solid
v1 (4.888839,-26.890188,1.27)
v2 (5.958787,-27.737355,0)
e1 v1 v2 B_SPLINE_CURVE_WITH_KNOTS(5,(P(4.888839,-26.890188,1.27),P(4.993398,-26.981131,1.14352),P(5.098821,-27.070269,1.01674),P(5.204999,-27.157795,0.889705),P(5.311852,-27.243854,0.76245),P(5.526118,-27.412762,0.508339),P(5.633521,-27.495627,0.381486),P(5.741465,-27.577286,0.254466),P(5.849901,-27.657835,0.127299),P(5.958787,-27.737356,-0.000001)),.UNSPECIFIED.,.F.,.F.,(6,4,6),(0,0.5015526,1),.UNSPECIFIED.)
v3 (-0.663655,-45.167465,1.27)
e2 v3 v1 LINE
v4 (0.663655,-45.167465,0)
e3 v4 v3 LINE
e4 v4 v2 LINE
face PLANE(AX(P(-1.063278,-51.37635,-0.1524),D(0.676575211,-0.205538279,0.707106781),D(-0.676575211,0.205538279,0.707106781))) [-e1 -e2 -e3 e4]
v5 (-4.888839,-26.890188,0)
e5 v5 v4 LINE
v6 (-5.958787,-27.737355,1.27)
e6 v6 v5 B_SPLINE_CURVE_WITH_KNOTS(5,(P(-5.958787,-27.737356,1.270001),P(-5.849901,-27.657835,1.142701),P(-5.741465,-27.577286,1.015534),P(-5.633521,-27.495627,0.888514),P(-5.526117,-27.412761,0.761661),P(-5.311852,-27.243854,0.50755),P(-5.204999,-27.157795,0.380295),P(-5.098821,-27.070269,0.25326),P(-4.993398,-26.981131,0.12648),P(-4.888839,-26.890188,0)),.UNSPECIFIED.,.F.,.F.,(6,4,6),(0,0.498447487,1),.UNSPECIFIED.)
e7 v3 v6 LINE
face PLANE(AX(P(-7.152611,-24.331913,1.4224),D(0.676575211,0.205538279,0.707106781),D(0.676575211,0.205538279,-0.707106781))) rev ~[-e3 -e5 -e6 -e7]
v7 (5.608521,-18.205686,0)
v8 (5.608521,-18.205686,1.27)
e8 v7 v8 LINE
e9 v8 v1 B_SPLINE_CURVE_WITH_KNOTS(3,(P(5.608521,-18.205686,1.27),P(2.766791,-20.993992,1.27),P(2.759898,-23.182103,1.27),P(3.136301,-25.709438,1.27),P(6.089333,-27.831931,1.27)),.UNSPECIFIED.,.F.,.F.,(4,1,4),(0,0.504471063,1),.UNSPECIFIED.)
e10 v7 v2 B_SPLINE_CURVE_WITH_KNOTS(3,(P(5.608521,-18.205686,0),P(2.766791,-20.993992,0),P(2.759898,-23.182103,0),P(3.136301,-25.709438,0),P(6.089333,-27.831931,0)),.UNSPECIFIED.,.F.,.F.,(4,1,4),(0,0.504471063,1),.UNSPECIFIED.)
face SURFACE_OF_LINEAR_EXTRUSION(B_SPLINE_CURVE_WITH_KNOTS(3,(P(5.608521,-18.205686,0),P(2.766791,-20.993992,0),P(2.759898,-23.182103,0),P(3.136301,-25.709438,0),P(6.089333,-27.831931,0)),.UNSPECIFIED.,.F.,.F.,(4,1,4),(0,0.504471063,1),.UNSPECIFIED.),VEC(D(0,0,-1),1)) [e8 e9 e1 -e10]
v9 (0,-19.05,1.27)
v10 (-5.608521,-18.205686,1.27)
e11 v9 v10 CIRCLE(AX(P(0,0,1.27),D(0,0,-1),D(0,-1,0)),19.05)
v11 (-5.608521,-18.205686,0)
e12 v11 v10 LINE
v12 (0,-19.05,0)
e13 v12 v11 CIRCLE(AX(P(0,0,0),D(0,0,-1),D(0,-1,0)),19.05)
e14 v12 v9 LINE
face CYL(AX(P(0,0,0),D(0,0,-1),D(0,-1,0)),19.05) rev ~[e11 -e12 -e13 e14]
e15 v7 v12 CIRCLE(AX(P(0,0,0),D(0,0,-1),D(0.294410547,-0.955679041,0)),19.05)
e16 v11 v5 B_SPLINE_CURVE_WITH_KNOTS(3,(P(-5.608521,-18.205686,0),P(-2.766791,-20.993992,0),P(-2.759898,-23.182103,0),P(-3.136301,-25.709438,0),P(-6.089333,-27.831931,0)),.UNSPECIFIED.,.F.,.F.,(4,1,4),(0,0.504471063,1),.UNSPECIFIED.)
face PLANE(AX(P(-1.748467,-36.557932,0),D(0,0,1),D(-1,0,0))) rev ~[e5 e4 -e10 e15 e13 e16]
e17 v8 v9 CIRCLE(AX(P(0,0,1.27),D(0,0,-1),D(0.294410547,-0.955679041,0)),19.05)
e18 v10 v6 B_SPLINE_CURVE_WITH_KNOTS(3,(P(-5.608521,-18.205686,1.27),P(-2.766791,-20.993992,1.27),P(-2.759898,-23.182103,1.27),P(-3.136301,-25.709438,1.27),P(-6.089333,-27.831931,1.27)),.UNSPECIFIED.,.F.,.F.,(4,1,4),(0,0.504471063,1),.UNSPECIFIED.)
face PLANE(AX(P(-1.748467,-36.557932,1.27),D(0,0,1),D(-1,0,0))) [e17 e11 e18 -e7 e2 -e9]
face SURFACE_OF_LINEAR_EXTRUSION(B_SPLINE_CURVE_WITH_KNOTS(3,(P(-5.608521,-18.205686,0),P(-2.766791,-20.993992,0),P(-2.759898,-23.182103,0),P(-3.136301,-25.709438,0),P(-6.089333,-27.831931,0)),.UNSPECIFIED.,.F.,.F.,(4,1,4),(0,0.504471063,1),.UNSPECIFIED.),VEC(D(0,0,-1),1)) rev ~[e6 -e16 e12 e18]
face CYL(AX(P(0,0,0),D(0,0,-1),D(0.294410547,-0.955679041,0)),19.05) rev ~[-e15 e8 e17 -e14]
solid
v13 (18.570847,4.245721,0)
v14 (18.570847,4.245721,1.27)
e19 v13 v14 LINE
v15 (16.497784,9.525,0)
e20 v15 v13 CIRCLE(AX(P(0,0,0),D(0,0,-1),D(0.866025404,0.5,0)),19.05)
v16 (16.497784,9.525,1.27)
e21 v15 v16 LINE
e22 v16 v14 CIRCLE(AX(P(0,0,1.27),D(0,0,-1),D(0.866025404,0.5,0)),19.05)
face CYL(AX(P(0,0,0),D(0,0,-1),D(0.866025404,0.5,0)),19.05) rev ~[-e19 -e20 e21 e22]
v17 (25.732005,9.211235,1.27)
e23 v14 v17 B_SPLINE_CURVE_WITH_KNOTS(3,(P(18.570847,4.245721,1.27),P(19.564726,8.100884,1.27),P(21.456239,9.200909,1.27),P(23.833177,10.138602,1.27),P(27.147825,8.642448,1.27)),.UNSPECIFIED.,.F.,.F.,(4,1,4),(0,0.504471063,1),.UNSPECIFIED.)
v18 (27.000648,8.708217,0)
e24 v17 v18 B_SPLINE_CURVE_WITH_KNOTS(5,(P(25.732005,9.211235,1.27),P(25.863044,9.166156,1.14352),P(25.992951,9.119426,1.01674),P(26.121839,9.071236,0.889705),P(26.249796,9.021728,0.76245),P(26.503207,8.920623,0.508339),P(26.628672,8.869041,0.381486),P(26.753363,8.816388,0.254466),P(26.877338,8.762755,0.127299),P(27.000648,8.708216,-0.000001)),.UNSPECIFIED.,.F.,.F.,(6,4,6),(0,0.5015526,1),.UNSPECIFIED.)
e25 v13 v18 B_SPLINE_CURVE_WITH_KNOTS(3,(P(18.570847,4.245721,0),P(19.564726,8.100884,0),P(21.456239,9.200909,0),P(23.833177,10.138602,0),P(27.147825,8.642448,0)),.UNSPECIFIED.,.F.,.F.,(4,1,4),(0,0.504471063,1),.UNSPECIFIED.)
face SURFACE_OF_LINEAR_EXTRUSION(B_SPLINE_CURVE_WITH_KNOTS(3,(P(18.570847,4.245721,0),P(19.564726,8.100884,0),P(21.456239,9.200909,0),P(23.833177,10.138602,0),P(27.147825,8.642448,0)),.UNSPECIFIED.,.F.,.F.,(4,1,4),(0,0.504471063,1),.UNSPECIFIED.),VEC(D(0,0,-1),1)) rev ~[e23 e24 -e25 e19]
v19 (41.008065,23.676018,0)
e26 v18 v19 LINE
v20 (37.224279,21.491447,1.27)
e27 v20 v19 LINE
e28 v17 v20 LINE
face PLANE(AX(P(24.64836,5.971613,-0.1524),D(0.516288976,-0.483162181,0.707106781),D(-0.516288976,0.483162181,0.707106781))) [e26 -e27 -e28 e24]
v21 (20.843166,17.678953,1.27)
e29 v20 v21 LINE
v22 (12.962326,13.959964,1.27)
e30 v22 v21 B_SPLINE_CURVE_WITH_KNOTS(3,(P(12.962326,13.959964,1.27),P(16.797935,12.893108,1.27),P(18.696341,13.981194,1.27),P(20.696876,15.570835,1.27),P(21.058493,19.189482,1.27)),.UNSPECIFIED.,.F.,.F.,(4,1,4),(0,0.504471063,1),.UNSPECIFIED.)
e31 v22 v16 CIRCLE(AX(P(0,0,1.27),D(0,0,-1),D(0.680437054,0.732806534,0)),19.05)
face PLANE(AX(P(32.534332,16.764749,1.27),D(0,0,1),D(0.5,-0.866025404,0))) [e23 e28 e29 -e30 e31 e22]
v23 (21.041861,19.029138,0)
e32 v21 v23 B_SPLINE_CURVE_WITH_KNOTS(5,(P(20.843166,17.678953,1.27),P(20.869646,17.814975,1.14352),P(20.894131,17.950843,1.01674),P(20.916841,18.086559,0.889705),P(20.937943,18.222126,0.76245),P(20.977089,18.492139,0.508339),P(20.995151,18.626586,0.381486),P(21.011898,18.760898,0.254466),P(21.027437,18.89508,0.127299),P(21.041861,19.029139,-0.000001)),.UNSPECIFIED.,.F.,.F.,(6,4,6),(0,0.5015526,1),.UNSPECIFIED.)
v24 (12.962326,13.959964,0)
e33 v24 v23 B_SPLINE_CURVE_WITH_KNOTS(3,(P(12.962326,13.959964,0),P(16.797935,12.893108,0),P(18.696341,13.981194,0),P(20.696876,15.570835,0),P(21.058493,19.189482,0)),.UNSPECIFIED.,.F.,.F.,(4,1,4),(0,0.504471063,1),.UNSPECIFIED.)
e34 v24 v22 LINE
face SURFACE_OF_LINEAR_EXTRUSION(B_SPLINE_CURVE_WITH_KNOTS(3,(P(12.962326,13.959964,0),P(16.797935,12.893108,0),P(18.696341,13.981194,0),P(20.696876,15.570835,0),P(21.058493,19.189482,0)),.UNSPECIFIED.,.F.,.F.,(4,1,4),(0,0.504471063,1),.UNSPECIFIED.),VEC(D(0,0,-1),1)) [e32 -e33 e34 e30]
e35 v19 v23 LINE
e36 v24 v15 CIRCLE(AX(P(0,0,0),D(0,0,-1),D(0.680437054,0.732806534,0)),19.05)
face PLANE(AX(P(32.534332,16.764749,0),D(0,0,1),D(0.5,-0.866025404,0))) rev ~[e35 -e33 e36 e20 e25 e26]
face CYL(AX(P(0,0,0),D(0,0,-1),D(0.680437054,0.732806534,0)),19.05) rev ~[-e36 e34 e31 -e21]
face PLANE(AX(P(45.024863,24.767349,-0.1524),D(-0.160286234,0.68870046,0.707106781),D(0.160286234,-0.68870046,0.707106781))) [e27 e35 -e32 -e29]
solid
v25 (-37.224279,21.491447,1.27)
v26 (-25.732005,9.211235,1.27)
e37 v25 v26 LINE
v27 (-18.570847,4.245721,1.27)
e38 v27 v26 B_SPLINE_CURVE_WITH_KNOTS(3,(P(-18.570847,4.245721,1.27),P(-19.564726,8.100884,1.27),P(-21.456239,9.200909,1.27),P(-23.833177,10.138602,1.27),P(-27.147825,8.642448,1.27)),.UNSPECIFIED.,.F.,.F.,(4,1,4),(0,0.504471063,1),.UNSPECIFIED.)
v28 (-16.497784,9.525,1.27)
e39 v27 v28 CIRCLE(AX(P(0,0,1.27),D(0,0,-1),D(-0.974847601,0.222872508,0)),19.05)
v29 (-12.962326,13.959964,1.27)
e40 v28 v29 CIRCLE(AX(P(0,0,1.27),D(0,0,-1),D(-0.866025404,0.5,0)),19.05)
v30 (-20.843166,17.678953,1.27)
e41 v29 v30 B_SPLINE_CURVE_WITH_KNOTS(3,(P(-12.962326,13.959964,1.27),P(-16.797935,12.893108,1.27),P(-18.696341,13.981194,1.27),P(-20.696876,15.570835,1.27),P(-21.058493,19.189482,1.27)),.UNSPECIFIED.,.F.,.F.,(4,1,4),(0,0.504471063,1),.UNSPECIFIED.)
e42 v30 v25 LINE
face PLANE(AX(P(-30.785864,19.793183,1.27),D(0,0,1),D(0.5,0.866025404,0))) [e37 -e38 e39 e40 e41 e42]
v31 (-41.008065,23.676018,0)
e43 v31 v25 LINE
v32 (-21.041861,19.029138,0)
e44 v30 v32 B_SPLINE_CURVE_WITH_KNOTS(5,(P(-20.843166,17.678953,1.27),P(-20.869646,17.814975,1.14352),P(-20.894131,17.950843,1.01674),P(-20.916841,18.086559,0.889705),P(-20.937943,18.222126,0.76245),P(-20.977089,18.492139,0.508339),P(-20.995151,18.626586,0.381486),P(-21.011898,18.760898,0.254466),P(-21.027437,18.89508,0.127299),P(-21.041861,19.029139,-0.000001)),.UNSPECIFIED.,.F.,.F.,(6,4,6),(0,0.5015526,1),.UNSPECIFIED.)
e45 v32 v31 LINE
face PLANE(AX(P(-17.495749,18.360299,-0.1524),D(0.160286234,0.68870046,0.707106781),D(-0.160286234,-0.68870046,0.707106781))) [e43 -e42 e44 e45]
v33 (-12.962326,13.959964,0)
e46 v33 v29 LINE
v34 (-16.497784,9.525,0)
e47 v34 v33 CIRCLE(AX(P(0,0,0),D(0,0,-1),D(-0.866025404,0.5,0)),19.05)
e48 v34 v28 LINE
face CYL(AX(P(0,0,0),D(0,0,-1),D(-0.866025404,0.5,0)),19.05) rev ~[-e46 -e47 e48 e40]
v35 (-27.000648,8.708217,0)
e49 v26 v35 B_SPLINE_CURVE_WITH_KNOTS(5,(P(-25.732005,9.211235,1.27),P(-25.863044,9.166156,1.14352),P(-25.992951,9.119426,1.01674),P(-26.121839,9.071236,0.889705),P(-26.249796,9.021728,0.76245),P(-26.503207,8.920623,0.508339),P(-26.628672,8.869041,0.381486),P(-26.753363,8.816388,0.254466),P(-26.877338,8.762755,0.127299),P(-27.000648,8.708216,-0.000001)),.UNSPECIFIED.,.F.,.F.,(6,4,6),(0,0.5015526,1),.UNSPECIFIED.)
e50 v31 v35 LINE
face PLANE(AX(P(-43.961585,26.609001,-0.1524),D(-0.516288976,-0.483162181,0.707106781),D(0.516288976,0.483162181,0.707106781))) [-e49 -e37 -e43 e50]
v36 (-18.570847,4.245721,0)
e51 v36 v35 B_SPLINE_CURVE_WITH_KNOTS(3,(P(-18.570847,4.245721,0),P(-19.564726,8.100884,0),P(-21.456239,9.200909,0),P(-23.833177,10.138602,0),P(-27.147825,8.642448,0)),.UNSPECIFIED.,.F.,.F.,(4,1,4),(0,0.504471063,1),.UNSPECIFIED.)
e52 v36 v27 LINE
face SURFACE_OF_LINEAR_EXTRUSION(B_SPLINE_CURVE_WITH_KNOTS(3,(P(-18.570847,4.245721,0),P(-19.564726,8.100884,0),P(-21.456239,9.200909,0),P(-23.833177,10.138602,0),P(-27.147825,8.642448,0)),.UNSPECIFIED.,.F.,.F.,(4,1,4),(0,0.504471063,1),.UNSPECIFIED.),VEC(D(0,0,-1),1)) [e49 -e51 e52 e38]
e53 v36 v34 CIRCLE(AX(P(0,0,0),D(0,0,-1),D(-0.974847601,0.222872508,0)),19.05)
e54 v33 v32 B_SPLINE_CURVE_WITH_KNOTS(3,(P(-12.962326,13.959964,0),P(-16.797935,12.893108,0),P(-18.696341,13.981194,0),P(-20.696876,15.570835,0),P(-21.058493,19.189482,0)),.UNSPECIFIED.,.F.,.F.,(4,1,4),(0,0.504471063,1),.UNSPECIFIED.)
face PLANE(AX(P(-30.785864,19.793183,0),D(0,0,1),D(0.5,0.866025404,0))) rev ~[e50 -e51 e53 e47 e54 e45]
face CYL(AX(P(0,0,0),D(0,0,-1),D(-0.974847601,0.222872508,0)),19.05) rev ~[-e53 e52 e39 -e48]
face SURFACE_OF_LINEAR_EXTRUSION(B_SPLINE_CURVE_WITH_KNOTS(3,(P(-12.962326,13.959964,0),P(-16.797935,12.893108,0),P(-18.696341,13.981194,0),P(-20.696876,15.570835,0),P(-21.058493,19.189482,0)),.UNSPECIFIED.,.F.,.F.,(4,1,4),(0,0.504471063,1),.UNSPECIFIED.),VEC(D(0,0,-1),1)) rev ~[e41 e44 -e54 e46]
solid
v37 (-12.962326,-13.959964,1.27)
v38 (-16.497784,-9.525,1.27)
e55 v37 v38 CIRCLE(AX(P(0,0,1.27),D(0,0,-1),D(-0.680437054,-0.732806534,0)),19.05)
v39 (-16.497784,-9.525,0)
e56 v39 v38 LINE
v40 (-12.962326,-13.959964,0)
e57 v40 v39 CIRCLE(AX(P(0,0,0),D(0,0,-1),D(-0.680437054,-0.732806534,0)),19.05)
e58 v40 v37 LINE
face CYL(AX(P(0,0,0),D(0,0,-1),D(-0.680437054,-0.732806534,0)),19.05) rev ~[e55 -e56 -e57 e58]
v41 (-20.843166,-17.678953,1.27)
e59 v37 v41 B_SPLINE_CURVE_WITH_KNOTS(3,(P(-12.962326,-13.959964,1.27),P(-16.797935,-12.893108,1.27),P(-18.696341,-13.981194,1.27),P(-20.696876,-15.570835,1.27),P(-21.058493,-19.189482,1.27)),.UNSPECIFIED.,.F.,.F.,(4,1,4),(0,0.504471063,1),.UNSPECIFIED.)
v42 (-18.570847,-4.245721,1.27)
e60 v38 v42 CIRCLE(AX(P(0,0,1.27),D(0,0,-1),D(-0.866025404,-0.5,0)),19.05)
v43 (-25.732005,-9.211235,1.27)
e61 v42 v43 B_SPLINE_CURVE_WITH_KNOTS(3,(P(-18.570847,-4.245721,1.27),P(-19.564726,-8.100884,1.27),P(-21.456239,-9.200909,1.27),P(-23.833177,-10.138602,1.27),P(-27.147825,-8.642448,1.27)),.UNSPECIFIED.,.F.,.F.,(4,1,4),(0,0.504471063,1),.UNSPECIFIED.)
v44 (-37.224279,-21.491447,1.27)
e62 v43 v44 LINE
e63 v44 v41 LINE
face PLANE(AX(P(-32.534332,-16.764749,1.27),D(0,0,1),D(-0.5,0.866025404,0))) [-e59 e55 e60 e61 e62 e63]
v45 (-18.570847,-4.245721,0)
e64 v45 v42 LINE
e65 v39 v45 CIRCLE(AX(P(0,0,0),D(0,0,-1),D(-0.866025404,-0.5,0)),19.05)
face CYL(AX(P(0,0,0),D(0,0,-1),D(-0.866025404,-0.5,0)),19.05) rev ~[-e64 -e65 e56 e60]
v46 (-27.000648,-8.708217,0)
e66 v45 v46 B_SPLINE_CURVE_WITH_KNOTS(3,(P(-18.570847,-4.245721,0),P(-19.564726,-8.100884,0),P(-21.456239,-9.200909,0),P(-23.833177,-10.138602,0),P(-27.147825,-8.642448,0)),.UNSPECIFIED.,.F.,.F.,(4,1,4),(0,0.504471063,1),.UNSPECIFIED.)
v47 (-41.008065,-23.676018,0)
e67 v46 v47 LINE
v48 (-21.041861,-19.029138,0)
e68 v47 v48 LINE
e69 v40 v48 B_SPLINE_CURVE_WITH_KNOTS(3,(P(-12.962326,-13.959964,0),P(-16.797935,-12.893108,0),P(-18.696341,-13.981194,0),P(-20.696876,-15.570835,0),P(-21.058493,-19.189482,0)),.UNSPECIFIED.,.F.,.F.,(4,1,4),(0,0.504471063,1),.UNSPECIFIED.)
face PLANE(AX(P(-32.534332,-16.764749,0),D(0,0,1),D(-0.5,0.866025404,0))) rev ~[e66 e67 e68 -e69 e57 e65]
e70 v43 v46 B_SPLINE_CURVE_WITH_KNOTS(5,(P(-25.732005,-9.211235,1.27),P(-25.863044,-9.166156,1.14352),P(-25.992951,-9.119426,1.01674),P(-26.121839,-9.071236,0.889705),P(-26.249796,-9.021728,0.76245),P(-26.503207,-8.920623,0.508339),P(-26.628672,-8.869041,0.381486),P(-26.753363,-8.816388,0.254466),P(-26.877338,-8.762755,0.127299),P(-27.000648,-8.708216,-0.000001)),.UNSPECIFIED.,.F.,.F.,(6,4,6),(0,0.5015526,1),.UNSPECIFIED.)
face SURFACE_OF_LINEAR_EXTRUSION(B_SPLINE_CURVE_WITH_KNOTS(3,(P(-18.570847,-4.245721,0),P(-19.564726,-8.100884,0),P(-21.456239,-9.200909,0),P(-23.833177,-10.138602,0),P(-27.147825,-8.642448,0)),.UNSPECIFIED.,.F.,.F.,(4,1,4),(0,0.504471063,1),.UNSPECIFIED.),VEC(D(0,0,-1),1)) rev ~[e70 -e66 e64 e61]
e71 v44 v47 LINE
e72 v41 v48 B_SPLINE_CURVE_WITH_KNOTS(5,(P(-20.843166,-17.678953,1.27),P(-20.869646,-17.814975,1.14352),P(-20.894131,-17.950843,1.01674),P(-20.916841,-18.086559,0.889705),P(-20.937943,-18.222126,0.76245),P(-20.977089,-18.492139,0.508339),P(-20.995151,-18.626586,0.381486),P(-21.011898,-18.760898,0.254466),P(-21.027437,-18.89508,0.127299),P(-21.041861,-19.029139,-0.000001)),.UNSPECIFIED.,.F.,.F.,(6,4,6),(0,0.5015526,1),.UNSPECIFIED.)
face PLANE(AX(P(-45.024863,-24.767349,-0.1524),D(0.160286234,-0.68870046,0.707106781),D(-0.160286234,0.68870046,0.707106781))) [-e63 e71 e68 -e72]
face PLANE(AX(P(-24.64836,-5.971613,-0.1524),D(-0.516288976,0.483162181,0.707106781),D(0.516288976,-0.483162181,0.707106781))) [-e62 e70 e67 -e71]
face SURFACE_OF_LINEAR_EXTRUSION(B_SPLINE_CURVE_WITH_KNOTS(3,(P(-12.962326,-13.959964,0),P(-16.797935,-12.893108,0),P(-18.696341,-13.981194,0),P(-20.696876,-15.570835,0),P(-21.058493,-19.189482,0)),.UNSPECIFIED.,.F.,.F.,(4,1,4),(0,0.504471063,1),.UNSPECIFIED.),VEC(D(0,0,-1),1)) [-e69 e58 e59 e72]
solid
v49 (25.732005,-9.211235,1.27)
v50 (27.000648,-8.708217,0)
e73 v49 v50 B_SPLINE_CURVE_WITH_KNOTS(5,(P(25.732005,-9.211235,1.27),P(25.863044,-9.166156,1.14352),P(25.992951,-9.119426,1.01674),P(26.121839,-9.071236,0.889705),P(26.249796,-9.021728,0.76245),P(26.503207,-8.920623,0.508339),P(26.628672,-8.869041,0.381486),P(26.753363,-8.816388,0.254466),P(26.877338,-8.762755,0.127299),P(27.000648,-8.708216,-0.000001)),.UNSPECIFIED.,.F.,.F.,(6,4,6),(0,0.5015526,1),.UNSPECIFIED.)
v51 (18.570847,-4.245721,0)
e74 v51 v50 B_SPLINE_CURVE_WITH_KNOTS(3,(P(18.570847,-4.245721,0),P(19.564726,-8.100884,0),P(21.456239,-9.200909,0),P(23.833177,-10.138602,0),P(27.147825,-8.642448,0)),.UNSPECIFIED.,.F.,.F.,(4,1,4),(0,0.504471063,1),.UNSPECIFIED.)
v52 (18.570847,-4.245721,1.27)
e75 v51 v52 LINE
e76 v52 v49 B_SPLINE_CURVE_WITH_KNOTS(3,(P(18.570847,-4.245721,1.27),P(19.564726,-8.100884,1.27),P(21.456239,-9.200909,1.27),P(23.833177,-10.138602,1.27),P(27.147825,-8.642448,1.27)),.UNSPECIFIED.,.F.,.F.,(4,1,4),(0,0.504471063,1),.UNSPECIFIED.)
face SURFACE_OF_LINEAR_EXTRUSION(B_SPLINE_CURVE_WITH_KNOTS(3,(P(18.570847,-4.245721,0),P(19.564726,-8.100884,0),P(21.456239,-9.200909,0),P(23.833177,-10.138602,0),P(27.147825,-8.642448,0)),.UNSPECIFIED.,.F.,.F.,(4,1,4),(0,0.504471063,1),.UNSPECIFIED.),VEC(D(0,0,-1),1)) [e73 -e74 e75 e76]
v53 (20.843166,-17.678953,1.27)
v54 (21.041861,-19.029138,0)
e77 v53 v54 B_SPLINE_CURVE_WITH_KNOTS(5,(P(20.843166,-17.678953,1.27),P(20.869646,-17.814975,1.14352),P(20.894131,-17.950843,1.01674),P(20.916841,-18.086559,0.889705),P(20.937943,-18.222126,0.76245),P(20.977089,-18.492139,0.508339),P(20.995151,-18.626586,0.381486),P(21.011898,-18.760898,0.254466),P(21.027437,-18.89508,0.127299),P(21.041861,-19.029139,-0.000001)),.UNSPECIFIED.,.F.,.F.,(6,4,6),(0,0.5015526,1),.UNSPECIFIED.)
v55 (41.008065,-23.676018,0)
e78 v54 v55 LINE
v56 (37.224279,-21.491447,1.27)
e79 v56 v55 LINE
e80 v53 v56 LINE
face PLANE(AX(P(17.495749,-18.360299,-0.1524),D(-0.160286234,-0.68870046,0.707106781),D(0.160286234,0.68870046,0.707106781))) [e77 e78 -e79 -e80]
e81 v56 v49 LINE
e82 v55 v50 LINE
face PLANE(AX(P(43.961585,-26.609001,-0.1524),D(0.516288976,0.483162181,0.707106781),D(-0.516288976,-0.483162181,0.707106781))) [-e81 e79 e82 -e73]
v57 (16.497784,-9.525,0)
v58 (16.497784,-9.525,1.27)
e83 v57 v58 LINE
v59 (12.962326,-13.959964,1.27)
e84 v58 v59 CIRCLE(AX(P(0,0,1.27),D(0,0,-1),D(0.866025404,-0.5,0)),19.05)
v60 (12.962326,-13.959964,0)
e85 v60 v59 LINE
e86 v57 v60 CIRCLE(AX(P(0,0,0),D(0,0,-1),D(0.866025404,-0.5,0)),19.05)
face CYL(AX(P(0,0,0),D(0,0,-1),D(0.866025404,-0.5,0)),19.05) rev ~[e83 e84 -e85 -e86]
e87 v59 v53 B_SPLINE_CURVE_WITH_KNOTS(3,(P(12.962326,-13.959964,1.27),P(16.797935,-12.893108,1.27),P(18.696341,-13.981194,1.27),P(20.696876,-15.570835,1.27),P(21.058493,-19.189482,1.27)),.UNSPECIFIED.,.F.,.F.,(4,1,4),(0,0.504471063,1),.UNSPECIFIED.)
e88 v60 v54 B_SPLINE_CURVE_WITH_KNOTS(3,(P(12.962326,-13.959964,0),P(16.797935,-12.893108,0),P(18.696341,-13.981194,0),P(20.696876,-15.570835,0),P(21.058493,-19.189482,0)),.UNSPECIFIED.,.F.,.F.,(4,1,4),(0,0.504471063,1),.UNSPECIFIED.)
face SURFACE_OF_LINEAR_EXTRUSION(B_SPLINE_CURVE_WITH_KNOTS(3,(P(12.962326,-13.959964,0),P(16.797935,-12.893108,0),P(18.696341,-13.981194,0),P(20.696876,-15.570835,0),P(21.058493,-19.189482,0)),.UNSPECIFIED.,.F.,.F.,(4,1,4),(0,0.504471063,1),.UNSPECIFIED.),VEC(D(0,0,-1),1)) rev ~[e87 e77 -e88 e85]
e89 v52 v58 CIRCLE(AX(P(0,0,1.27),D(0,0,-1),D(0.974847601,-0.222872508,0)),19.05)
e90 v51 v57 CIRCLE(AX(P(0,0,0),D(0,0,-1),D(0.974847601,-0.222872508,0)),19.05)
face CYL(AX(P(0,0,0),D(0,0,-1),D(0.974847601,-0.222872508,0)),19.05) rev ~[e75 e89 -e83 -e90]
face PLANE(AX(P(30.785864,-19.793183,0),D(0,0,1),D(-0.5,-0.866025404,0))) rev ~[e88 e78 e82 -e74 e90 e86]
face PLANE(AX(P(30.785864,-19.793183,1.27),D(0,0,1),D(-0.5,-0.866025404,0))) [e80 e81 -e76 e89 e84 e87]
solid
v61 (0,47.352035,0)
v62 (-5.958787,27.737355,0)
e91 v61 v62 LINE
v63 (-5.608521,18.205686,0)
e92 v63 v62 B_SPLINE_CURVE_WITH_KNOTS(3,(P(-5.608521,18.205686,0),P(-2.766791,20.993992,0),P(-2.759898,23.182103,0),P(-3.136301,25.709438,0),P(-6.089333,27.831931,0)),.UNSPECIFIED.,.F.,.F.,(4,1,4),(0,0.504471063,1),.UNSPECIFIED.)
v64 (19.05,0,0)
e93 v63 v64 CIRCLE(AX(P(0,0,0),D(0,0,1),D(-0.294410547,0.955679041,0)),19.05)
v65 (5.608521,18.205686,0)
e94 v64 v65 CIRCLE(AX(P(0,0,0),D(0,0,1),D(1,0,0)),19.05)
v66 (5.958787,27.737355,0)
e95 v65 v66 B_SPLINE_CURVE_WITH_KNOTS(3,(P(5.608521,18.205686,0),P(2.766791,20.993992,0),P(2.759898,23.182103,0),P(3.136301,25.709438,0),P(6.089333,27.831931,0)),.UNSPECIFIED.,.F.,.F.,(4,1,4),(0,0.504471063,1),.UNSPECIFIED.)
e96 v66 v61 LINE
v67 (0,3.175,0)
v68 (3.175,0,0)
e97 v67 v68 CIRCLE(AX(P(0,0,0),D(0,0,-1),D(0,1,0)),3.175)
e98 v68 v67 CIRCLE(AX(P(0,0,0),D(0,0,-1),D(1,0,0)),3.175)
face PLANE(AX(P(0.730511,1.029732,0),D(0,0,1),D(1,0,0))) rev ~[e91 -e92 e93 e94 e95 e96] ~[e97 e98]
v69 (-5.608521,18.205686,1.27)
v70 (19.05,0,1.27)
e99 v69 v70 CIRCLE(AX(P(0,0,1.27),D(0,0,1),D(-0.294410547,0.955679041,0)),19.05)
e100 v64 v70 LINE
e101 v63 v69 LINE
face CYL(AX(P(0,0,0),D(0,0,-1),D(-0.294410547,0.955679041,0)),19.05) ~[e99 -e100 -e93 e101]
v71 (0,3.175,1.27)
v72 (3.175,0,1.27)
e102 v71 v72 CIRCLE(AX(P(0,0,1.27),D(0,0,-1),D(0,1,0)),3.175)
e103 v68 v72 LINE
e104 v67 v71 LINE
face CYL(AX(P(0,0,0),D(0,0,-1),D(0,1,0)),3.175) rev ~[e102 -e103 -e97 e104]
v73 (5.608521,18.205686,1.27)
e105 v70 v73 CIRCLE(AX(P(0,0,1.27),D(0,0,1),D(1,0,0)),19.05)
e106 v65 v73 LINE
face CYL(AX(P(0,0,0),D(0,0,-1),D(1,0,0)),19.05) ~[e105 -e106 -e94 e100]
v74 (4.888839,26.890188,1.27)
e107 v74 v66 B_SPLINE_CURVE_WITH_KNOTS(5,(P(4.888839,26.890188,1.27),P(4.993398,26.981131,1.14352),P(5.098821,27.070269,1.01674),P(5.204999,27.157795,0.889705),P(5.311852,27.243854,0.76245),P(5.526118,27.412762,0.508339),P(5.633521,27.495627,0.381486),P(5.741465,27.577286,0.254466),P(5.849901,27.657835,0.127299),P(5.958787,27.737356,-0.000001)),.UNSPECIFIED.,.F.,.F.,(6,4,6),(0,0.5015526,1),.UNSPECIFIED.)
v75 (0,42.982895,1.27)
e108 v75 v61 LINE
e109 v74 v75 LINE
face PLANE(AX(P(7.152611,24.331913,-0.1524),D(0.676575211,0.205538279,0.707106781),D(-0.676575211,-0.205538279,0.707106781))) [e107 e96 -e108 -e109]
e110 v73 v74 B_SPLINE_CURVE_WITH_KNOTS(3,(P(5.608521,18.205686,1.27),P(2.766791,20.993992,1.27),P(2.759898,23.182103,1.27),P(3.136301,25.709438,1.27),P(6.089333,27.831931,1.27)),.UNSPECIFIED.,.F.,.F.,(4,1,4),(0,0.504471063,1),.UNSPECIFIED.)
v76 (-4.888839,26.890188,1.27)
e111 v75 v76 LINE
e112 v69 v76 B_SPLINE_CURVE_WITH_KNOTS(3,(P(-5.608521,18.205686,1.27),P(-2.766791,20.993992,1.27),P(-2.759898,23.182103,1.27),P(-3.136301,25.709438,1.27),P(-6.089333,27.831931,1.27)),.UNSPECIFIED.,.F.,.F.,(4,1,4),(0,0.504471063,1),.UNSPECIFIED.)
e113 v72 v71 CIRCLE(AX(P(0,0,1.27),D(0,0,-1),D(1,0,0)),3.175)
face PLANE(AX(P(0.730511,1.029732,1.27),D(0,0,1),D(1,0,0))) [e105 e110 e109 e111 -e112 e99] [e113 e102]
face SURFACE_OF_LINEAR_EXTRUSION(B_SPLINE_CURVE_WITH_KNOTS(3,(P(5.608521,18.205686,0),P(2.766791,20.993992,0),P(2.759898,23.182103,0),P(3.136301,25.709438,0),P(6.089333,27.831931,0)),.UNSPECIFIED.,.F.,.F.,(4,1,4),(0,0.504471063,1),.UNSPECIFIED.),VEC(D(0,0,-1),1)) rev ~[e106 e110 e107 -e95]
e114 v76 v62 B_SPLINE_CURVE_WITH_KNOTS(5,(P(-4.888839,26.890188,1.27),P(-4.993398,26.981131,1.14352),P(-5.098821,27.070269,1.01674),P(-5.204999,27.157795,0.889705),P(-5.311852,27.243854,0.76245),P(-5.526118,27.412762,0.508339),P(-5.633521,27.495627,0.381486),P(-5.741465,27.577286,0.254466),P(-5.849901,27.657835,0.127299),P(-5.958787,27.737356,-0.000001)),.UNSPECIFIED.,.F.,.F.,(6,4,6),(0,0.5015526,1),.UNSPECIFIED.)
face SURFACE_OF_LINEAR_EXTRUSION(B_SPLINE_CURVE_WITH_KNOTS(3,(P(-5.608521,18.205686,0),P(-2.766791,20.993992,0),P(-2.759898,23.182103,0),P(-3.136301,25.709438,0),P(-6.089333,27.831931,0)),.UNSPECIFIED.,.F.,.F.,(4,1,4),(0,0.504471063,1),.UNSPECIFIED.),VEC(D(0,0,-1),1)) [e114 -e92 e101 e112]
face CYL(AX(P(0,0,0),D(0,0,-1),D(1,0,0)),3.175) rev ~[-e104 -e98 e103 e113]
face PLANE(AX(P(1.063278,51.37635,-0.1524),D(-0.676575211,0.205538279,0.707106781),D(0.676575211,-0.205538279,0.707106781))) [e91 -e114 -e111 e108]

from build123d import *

# Parameters (mm, degrees)
F1_DEPTH      = 1.27
F2_COUNT      = 6
F3_DEPTH      = 1.27
F4_T1_DEPTH   = 28.2648616639
F4_T3_DEPTH   = 28.2648616639
F4_2_T1_DEPTH = 28.2648616639
F4_2_T3_DEPTH = 28.2648616639
F4_3_T1_DEPTH = 28.2648616639
F4_3_T3_DEPTH = 28.2648616639
F4_4_T1_DEPTH = 28.2648616639
F4_4_T3_DEPTH = 28.2648616639
F4_5_T1_DEPTH = 28.2648616639
F4_5_T3_DEPTH = 28.2648616639
F4_6_T1_DEPTH = 28.2648616639
F4_6_T3_DEPTH = 28.2648616639


# Not quite as in the source:
# - a fillet or chamfer that OpenCascade refuses, or shapes differently, is made with other operations: its cross-section is extruded or revolved along the edge and cut away or added


with BuildPart() as f1:
    # F0 (on Top) → F1 (new body)
    with BuildSketch(Plane.XY):
        Polygon((0, 27.8319306672), (6.0893329792, 27.8319306672), (0, 47.8763319552), align=None)
        Polygon((0, 47.8763319552), (-6.0893329792, 27.8319306672), (0, 27.8319306672), align=None)
        with BuildLine():
            add(Edge.make_bspline(
                [(-5.6085209245, 18.2056857338), (-2.7667914864, 20.9939918215), (-2.759898495, 23.1821026248), (-3.1363011766, 25.7094376402), (-6.0893329792, 27.8319306672)],
                knots=[0, 0, 0, 0, 0.5044710626, 1, 1, 1, 1], degree=3))
            ThreePointArc((-5.6085209245, 18.2056857338), (-2.8358584917, 18.8377388934), (0, 19.05))
            Line((0, 19.05), (0, 27.8319306672))
            Line((0, 27.8319306672), (-6.0893329792, 27.8319306672))
        make_face()
        with BuildLine():
            ThreePointArc((0, 19.05), (2.8358584917, 18.8377388934), (5.6085209245, 18.2056857338))
            add(Edge.make_bspline(
                [(5.6085209245, 18.2056857338), (2.7667914864, 20.9939918215), (2.759898495, 23.1821026248), (3.1363011766, 25.7094376402), (6.0893329792, 27.8319306672)],
                knots=[0, 0, 0, 0, 0.5044710626, 1, 1, 1, 1], degree=3))
            Line((6.0893329792, 27.8319306672), (0, 27.8319306672))
            Line((0, 27.8319306672), (0, 19.05))
        make_face()
    extrude(amount=F1_DEPTH)


with BuildPart() as f2_1:
    # F2: instance of F1
    add(f1.part.rotate(Axis((0, 0, 0), (0, 0, 1)), 1 * 360 / F2_COUNT))

    # F4#2: chamfer of 1.4224 on 2 edges, made by hand

    # F4_2_s2 → F4_2_t1 (cut)
    with BuildSketch(Plane(origin=(-20.6503164596, 4.8060973638, 0), x_dir=(0, 0, 1), z_dir=(-0.9739695304, 0.2266789665, 0))):
        Polygon((-0.1524, 13.9164538313), (1.27, 12.4940538313), (1.27, 13.9164538313), align=None)
    extrude(amount=F4_2_T1_DEPTH, mode=Mode.SUBTRACT)

    # F4_2_s4 → F4_2_t3 (cut)
    with BuildSketch(Plane(origin=(-33.8005854034, 36.1180372572, 0), x_dir=(0, 0, 1), z_dir=(0.6832945087, -0.7301428726, 0))):
        Polygon((-0.1524, 13.9164538313), (1.27, 12.4940538313), (1.27, 13.9164538313), align=None)
    extrude(amount=F4_2_T3_DEPTH, mode=Mode.SUBTRACT)


with BuildPart() as f2_2:
    # F2: instance of F1
    add(f1.part.rotate(Axis((0, 0, 0), (0, 0, 1)), 2 * 360 / F2_COUNT))

    # F4#3: chamfer of 1.4224 on 2 edges, made by hand

    # F4_3_s2 → F4_3_t1 (cut)
    with BuildSketch(Plane(origin=(-48.1794305013, -11.2131469935, 0), x_dir=(0, 0, 1), z_dir=(0.9739695304, 0.2266789665, 0))):
        Polygon((-0.1524, 13.9164538313), (1.27, 12.4940538313), (1.27, 13.9164538313), align=None)
    extrude(amount=F4_3_T1_DEPTH, mode=Mode.SUBTRACT)

    # F4_3_s4 → F4_3_t3 (cut)
    with BuildSketch(Plane(origin=(-14.4873606399, -15.4806499682, 0), x_dir=(0, 0, 1), z_dir=(-0.6832945087, -0.7301428726, 0))):
        Polygon((-0.1524, 13.9164538313), (1.27, 12.4940538313), (1.27, 13.9164538313), align=None)
    extrude(amount=F4_3_T3_DEPTH, mode=Mode.SUBTRACT)


with BuildPart() as f2_3:
    # F2: instance of F1
    add(f1.part.rotate(Axis((0, 0, 0), (0, 0, 1)), 3 * 360 / F2_COUNT))

    # F4#4: chamfer of 1.4224 on 2 edges, made by hand

    # F4_4_s2 → F4_4_t1 (cut)
    with BuildSketch(Plane(origin=(-14.3788450979, -47.3311842507, 0), x_dir=(0, 0, 1), z_dir=(0.2906750217, 0.9568218391, 0))):
        Polygon((-0.1524, 13.9164538313), (1.27, 12.4940538313), (1.27, 13.9164538313), align=None)
    extrude(amount=F4_4_T1_DEPTH, mode=Mode.SUBTRACT)

    # F4_4_s4 → F4_4_t3 (cut)
    with BuildSketch(Plane(origin=(6.1629558196, -20.2867473321, 0), x_dir=(0, 0, 1), z_dir=(0.2906750217, -0.9568218391, 0))):
        Polygon((1.4224, 13.9164538313), (0, 12.4940538313), (0, 13.9164538313), align=None)
    extrude(amount=F4_4_T3_DEPTH, mode=Mode.SUBTRACT)


with BuildPart() as f2_4:
    # F2: instance of F1
    add(f1.part.rotate(Axis((0, 0, 0), (0, 0, 1)), 4 * 360 / F2_COUNT))

    # F4#5: chamfer of 1.4224 on 2 edges, made by hand

    # F4_5_s2 → F4_5_t1 (cut)
    with BuildSketch(Plane(origin=(33.8005854034, -36.1180372572, 0), x_dir=(0, 0, 1), z_dir=(-0.6832945087, 0.7301428726, 0))):
        Polygon((-0.1524, 13.9164538313), (1.27, 12.4940538313), (1.27, 13.9164538313), align=None)
    extrude(amount=F4_5_T1_DEPTH, mode=Mode.SUBTRACT)

    # F4_5_s4 → F4_5_t3 (cut)
    with BuildSketch(Plane(origin=(20.6503164596, -4.8060973638, 0), x_dir=(0, 0, 1), z_dir=(0.9739695304, -0.2266789665, 0))):
        Polygon((-0.1524, 13.9164538313), (1.27, 12.4940538313), (1.27, 13.9164538313), align=None)
    extrude(amount=F4_5_T3_DEPTH, mode=Mode.SUBTRACT)


with BuildPart() as f2_5:
    # F2: instance of F1
    add(f1.part.rotate(Axis((0, 0, 0), (0, 0, 1)), 5 * 360 / F2_COUNT))

    # F4#6: chamfer of 1.4224 on 2 edges, made by hand

    # F4_6_s2 → F4_6_t1 (cut)
    with BuildSketch(Plane(origin=(48.1794305013, 11.2131469935, 0), x_dir=(0, 0, 1), z_dir=(-0.9739695304, -0.2266789665, 0))):
        Polygon((-0.1524, 13.9164538313), (1.27, 12.4940538313), (1.27, 13.9164538313), align=None)
    extrude(amount=F4_6_T1_DEPTH, mode=Mode.SUBTRACT)

    # F4_6_s4 → F4_6_t3 (cut)
    with BuildSketch(Plane(origin=(14.4873606399, 15.4806499682, 0), x_dir=(0, 0, 1), z_dir=(0.6832945087, 0.7301428726, 0))):
        Polygon((-0.1524, 13.9164538313), (1.27, 12.4940538313), (1.27, 13.9164538313), align=None)
    extrude(amount=F4_6_T3_DEPTH, mode=Mode.SUBTRACT)


with BuildPart() as f1_1:
    add(f1.part)

    # F0 (on Top) → F3 (join)
    with BuildSketch(Plane.XY):
        with BuildLine():
            ThreePointArc((-5.6085209245, 18.2056857338), (-11.3150381437, -15.3255476837), (19.05, 0))
            ThreePointArc((19.05, 0), (15.3255476837, 11.3150381437), (5.6085209245, 18.2056857338))
            ThreePointArc((5.6085209245, 18.2056857338), (2.8358584917, 18.8377388934), (0, 19.05))
            ThreePointArc((0, 19.05), (-2.8358584917, 18.8377388934), (-5.6085209245, 18.2056857338))
        make_face()
        with BuildLine():
            ThreePointArc((3.175, 0), (-2.2450640303, -2.2450640303), (0, 3.175))
            ThreePointArc((0, 3.175), (2.2450640303, 2.2450640303), (3.175, 0))
        make_face(mode=Mode.SUBTRACT)
    extrude(amount=F3_DEPTH)

    # F4: chamfer of 1.4224 on 2 edges, made by hand

    # F4_s2 → F4_t1 (cut)
    with BuildSketch(Plane(origin=(14.3788450979, 47.3311842507, 0), x_dir=(0, 0, 1), z_dir=(-0.2906750217, -0.9568218391, 0))):
        Polygon((-0.1524, 13.9164538313), (1.27, 12.4940538313), (1.27, 13.9164538313), align=None)
    extrude(amount=F4_T1_DEPTH, mode=Mode.SUBTRACT)

    # F4_s4 → F4_t3 (cut)
    with BuildSketch(Plane(origin=(-6.1629558196, 20.2867473321, 0), x_dir=(0, 0, 1), z_dir=(-0.2906750217, 0.9568218391, 0))):
        Polygon((-0.1524, 13.9164538313), (1.27, 12.4940538313), (1.27, 13.9164538313), align=None)
    extrude(amount=F4_T3_DEPTH, mode=Mode.SUBTRACT)


solid = Compound([f2_1.part, f2_2.part, f2_3.part, f2_4.part, f2_5.part, f1_1.part])
